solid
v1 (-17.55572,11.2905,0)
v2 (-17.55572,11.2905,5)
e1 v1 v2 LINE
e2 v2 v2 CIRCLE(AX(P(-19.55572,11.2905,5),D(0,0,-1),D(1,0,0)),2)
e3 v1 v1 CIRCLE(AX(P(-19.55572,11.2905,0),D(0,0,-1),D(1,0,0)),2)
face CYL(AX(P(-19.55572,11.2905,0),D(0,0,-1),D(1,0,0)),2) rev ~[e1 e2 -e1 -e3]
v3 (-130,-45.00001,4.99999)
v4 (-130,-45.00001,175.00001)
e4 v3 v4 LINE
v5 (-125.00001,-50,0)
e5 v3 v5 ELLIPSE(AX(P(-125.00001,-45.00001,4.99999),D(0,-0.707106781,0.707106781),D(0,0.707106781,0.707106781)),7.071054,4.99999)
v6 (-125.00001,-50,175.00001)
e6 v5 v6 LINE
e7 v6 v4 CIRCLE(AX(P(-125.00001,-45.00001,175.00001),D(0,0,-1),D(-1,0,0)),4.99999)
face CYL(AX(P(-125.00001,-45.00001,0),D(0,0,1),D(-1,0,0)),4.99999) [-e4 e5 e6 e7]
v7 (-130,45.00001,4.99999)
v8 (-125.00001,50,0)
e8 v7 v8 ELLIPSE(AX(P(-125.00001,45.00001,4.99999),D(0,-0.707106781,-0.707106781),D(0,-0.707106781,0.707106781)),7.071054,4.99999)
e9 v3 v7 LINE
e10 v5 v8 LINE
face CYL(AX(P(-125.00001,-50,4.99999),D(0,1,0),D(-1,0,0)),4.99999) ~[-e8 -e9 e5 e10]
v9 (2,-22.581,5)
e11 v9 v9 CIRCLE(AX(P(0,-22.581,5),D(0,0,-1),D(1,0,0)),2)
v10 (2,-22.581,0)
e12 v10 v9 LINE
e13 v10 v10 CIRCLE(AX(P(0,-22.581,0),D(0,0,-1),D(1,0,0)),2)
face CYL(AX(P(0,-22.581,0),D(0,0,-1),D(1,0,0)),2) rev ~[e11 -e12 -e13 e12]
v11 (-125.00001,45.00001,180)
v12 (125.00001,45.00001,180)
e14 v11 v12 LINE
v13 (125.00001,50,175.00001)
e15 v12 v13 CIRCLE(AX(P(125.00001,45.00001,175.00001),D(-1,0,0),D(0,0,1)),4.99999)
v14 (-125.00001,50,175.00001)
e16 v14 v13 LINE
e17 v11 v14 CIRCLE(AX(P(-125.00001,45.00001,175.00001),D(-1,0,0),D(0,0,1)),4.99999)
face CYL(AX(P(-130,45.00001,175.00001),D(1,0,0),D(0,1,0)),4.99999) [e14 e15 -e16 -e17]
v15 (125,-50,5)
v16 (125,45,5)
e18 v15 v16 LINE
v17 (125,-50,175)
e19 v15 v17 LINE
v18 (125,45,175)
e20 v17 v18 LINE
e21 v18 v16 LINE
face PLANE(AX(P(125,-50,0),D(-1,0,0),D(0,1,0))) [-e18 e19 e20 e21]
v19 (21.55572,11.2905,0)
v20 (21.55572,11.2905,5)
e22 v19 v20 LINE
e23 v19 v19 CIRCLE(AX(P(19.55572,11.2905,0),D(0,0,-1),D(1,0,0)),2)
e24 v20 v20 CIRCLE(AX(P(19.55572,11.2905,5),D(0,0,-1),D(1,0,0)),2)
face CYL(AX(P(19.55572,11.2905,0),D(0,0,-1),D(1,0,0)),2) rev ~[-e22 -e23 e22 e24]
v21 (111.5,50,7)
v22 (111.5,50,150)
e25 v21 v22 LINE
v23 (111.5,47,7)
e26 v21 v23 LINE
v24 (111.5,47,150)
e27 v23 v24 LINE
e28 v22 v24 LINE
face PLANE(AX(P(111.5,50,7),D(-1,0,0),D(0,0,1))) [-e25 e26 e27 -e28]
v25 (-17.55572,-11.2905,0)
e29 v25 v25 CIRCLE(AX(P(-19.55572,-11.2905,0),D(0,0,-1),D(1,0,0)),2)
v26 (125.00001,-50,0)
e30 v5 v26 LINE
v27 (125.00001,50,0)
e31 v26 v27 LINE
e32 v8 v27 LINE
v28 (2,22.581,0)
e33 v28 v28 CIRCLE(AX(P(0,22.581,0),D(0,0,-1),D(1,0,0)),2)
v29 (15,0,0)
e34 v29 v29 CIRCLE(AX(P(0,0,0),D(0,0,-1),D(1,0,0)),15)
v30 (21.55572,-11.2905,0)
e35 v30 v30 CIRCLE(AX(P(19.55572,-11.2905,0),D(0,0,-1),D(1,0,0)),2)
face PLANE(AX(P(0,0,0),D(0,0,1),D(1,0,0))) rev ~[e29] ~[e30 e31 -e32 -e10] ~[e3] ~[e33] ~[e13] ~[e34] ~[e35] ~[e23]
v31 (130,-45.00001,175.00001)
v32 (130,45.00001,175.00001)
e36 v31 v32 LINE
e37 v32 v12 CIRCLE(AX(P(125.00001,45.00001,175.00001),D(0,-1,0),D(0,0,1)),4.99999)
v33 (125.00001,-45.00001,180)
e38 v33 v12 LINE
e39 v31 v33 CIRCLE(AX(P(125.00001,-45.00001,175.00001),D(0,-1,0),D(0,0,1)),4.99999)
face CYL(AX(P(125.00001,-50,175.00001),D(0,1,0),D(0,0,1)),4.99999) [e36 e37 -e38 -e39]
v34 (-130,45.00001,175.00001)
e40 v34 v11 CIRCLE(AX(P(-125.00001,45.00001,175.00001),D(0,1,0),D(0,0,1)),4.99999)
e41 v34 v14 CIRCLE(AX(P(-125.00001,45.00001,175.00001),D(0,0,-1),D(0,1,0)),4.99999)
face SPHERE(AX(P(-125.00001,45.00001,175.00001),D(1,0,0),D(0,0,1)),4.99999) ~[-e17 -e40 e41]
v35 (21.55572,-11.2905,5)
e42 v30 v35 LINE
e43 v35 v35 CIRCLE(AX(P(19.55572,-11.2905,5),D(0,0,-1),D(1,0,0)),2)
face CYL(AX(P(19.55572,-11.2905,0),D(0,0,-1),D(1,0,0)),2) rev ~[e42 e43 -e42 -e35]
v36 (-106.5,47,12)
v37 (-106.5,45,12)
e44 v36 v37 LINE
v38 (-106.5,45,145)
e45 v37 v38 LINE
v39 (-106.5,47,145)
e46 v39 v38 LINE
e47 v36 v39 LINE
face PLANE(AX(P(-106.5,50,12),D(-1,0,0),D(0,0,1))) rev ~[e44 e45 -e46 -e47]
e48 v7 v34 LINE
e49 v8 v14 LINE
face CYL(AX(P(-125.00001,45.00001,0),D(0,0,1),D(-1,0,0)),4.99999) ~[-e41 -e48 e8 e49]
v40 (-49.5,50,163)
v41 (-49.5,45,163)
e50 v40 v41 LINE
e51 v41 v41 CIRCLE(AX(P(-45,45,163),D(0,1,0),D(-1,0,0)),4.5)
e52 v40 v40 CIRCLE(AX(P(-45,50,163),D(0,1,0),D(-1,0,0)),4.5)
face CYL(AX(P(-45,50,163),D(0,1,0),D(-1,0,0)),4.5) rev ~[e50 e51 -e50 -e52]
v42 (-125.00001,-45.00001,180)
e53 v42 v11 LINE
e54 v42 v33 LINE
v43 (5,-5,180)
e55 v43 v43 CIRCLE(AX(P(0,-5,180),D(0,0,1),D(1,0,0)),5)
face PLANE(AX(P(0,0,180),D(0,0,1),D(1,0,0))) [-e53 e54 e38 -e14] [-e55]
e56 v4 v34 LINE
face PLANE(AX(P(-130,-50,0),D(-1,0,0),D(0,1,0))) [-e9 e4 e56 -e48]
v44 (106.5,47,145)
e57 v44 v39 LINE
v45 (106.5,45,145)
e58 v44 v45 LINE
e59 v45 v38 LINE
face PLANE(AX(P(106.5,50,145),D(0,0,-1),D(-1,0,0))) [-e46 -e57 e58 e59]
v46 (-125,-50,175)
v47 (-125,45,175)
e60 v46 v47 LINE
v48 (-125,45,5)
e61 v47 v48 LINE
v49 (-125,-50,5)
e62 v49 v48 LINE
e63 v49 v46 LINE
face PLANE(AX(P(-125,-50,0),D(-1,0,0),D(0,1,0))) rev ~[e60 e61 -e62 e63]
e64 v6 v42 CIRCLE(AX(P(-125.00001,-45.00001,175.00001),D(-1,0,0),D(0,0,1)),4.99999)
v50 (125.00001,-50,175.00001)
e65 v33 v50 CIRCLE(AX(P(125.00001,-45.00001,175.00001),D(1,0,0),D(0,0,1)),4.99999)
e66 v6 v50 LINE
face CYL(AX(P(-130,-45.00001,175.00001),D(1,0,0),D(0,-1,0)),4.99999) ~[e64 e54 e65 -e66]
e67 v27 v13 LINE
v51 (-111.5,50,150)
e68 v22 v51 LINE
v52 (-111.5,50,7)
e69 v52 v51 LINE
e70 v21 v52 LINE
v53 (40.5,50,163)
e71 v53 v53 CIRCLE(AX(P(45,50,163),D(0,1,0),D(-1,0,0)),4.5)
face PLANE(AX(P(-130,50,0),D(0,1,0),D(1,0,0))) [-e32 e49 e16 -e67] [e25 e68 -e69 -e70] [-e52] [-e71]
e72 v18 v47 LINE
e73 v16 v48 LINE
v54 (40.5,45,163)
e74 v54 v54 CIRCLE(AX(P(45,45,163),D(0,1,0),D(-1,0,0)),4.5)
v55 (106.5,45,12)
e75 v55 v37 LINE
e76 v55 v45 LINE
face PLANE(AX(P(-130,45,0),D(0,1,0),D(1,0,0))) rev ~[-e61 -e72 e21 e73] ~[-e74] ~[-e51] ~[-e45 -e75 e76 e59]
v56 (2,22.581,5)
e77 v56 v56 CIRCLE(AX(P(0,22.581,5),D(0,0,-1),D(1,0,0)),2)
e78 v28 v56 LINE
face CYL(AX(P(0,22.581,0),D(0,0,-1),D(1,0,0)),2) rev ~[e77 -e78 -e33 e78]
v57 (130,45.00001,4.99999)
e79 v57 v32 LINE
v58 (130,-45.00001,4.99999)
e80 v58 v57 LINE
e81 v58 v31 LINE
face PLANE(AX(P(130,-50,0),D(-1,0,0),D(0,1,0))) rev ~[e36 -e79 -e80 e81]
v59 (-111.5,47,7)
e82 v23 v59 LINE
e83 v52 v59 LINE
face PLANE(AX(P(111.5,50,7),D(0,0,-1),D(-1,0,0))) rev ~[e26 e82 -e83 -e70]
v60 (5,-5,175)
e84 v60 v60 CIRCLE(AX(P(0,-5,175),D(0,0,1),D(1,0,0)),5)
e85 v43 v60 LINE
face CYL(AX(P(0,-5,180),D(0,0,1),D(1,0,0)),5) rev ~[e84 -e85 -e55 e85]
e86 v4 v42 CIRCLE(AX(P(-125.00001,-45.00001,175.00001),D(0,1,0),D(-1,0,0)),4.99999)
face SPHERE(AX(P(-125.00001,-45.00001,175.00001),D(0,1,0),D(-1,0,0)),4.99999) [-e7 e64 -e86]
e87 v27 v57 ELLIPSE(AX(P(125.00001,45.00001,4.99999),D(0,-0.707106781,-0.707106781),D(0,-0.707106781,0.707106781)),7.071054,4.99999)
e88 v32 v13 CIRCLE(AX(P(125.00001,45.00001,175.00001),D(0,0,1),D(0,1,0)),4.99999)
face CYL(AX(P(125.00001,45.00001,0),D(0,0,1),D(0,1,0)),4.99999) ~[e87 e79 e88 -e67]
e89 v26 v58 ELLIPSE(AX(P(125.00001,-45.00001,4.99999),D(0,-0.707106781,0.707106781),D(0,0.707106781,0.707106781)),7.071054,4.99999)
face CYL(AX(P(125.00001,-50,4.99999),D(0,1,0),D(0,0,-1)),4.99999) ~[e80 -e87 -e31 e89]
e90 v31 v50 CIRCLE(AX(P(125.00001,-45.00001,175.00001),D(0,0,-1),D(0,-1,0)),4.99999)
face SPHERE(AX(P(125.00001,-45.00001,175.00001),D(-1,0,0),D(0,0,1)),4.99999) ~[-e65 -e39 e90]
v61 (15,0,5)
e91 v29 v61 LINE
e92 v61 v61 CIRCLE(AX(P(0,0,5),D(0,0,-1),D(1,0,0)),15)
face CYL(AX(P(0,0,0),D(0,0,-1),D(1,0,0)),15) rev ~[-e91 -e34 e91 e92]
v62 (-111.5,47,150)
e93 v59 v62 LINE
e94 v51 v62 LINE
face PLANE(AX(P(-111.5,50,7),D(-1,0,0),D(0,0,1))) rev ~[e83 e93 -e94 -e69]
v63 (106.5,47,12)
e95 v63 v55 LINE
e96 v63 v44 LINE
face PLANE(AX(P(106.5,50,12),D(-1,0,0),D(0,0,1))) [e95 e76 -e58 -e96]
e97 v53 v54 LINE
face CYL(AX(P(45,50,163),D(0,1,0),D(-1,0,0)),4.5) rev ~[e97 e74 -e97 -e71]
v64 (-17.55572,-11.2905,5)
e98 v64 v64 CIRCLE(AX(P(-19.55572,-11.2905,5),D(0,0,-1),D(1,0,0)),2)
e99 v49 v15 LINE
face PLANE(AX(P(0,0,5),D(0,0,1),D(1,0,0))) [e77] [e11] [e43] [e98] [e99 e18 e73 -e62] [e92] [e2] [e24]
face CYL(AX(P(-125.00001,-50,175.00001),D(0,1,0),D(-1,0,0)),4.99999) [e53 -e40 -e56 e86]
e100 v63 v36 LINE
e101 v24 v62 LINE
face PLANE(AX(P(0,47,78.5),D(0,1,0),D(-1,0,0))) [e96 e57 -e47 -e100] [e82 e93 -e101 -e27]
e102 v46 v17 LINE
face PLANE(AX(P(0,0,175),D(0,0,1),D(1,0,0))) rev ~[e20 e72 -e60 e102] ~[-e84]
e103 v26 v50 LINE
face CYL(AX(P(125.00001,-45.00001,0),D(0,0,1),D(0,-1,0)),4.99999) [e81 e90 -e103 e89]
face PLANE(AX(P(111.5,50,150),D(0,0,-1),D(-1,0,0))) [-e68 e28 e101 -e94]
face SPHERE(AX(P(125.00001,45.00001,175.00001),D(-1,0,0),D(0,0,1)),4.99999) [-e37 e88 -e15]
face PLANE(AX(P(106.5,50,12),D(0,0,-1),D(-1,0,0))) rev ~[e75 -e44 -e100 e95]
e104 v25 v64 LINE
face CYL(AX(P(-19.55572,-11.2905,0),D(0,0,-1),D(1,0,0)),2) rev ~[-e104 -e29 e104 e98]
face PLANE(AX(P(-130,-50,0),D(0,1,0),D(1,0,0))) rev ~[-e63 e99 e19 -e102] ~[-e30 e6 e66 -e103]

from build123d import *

# Parameters (mm, degrees)
F0_W      = 260
F0_H      = 100
F1_DEPTH  = 180
F2_T      = -5
F3_W      = 223
F3_H      = 143
F3_W_2    = 212.9999995232
F3_H_2    = 132.9999995232
F4_DEPTH  = 3
F5_DEPTH  = 25
F3_R      = 4.5
F6_DEPTH  = 25
F7_R      = 2
F7_R_2    = 15
F8_DEPTH  = 25
F9_R      = 4.99999
F10_R     = 5
F11_DEPTH = 25


# Not quite as in the source:
# - a fillet or chamfer is up to 0.001 mm smaller than in the source, because OpenCascade refuses the exact size


with BuildPart() as f1:
    # F0 (on Top) → F1 (new body)
    with BuildSketch(Plane.XY):
        Rectangle(F0_W, F0_H)
    extrude(amount=F1_DEPTH)

    # F2
    f2_openings = [f1.faces().sort_by_distance(p)[0] for p in [
        (0, -50, 90),
    ]]
    offset(amount=F2_T, openings=f2_openings)

    # F3 (on face) → F4 (cut)
    with BuildSketch(Plane(origin=(0, 50, 0), x_dir=(-1, 0, 0), z_dir=(0, 1, 0))):
        with Locations((0, 78.5)):
            Rectangle(F3_W, F3_H)
        with Locations((0, 78.5)):
            Rectangle(F3_W_2, F3_H_2, mode=Mode.SUBTRACT)
    extrude(amount=-F4_DEPTH, mode=Mode.SUBTRACT)

    # F5 (cut): a face of the model
    f5_faces = [f1.faces().sort_by_distance(p)[0] for p in [
        (0, 50, 78.5),
    ]]
    extrude(f5_faces, amount=-F5_DEPTH, mode=Mode.SUBTRACT)

    # F3 (on face) → F6 (cut)
    with BuildSketch(Plane(origin=(0, 50, 0), x_dir=(-1, 0, 0), z_dir=(0, 1, 0))):
        with Locations((-45, 163)):
            Circle(F3_R)
        with Locations((45, 163)):
            Circle(F3_R)
    extrude(amount=-F6_DEPTH, mode=Mode.SUBTRACT)

    # F7 (on face) → F8 (cut)
    with BuildSketch(Plane(origin=(0, 0, 0), x_dir=(1, 0, 0), z_dir=(0, 0, -1))):
        with Locations((-19.5557196429, 11.2905)):
            Circle(F7_R)
        with Locations((0, 22.581)):
            Circle(F7_R)
        with Locations((19.5557196429, 11.2905)):
            Circle(F7_R)
        with Locations((19.5557196429, -11.2905)):
            Circle(F7_R)
        with Locations((0, -22.581)):
            Circle(F7_R)
        with Locations((-19.5557196429, -11.2905)):
            Circle(F7_R)
        Circle(F7_R_2)
    extrude(amount=-F8_DEPTH, mode=Mode.SUBTRACT)

    # F9 (radius 5 in the source; OpenCascade refuses exactly that, so slightly less here)
    f9_edges = [f1.edges().sort_by_distance(p)[0] for p in [
        (0, 50, 180),
        (-130, 0, 180),
        (-130, 50, 90),
        (-130, -50, 90),
        (-130, 0, 0),
        (0, -50, 180),
        (130, 0, 180),
        (130, -50, 90),
        (130, 50, 90),
        (130, 0, 0),
    ]]
    fillet(f9_edges, radius=F9_R)

    # F10 (on face) → F11 (cut)
    with BuildSketch(Plane.XY.offset(180)):
        with Locations((0, -5)):
            Circle(F10_R)
    extrude(amount=-F11_DEPTH, mode=Mode.SUBTRACT)


solid = f1.part
